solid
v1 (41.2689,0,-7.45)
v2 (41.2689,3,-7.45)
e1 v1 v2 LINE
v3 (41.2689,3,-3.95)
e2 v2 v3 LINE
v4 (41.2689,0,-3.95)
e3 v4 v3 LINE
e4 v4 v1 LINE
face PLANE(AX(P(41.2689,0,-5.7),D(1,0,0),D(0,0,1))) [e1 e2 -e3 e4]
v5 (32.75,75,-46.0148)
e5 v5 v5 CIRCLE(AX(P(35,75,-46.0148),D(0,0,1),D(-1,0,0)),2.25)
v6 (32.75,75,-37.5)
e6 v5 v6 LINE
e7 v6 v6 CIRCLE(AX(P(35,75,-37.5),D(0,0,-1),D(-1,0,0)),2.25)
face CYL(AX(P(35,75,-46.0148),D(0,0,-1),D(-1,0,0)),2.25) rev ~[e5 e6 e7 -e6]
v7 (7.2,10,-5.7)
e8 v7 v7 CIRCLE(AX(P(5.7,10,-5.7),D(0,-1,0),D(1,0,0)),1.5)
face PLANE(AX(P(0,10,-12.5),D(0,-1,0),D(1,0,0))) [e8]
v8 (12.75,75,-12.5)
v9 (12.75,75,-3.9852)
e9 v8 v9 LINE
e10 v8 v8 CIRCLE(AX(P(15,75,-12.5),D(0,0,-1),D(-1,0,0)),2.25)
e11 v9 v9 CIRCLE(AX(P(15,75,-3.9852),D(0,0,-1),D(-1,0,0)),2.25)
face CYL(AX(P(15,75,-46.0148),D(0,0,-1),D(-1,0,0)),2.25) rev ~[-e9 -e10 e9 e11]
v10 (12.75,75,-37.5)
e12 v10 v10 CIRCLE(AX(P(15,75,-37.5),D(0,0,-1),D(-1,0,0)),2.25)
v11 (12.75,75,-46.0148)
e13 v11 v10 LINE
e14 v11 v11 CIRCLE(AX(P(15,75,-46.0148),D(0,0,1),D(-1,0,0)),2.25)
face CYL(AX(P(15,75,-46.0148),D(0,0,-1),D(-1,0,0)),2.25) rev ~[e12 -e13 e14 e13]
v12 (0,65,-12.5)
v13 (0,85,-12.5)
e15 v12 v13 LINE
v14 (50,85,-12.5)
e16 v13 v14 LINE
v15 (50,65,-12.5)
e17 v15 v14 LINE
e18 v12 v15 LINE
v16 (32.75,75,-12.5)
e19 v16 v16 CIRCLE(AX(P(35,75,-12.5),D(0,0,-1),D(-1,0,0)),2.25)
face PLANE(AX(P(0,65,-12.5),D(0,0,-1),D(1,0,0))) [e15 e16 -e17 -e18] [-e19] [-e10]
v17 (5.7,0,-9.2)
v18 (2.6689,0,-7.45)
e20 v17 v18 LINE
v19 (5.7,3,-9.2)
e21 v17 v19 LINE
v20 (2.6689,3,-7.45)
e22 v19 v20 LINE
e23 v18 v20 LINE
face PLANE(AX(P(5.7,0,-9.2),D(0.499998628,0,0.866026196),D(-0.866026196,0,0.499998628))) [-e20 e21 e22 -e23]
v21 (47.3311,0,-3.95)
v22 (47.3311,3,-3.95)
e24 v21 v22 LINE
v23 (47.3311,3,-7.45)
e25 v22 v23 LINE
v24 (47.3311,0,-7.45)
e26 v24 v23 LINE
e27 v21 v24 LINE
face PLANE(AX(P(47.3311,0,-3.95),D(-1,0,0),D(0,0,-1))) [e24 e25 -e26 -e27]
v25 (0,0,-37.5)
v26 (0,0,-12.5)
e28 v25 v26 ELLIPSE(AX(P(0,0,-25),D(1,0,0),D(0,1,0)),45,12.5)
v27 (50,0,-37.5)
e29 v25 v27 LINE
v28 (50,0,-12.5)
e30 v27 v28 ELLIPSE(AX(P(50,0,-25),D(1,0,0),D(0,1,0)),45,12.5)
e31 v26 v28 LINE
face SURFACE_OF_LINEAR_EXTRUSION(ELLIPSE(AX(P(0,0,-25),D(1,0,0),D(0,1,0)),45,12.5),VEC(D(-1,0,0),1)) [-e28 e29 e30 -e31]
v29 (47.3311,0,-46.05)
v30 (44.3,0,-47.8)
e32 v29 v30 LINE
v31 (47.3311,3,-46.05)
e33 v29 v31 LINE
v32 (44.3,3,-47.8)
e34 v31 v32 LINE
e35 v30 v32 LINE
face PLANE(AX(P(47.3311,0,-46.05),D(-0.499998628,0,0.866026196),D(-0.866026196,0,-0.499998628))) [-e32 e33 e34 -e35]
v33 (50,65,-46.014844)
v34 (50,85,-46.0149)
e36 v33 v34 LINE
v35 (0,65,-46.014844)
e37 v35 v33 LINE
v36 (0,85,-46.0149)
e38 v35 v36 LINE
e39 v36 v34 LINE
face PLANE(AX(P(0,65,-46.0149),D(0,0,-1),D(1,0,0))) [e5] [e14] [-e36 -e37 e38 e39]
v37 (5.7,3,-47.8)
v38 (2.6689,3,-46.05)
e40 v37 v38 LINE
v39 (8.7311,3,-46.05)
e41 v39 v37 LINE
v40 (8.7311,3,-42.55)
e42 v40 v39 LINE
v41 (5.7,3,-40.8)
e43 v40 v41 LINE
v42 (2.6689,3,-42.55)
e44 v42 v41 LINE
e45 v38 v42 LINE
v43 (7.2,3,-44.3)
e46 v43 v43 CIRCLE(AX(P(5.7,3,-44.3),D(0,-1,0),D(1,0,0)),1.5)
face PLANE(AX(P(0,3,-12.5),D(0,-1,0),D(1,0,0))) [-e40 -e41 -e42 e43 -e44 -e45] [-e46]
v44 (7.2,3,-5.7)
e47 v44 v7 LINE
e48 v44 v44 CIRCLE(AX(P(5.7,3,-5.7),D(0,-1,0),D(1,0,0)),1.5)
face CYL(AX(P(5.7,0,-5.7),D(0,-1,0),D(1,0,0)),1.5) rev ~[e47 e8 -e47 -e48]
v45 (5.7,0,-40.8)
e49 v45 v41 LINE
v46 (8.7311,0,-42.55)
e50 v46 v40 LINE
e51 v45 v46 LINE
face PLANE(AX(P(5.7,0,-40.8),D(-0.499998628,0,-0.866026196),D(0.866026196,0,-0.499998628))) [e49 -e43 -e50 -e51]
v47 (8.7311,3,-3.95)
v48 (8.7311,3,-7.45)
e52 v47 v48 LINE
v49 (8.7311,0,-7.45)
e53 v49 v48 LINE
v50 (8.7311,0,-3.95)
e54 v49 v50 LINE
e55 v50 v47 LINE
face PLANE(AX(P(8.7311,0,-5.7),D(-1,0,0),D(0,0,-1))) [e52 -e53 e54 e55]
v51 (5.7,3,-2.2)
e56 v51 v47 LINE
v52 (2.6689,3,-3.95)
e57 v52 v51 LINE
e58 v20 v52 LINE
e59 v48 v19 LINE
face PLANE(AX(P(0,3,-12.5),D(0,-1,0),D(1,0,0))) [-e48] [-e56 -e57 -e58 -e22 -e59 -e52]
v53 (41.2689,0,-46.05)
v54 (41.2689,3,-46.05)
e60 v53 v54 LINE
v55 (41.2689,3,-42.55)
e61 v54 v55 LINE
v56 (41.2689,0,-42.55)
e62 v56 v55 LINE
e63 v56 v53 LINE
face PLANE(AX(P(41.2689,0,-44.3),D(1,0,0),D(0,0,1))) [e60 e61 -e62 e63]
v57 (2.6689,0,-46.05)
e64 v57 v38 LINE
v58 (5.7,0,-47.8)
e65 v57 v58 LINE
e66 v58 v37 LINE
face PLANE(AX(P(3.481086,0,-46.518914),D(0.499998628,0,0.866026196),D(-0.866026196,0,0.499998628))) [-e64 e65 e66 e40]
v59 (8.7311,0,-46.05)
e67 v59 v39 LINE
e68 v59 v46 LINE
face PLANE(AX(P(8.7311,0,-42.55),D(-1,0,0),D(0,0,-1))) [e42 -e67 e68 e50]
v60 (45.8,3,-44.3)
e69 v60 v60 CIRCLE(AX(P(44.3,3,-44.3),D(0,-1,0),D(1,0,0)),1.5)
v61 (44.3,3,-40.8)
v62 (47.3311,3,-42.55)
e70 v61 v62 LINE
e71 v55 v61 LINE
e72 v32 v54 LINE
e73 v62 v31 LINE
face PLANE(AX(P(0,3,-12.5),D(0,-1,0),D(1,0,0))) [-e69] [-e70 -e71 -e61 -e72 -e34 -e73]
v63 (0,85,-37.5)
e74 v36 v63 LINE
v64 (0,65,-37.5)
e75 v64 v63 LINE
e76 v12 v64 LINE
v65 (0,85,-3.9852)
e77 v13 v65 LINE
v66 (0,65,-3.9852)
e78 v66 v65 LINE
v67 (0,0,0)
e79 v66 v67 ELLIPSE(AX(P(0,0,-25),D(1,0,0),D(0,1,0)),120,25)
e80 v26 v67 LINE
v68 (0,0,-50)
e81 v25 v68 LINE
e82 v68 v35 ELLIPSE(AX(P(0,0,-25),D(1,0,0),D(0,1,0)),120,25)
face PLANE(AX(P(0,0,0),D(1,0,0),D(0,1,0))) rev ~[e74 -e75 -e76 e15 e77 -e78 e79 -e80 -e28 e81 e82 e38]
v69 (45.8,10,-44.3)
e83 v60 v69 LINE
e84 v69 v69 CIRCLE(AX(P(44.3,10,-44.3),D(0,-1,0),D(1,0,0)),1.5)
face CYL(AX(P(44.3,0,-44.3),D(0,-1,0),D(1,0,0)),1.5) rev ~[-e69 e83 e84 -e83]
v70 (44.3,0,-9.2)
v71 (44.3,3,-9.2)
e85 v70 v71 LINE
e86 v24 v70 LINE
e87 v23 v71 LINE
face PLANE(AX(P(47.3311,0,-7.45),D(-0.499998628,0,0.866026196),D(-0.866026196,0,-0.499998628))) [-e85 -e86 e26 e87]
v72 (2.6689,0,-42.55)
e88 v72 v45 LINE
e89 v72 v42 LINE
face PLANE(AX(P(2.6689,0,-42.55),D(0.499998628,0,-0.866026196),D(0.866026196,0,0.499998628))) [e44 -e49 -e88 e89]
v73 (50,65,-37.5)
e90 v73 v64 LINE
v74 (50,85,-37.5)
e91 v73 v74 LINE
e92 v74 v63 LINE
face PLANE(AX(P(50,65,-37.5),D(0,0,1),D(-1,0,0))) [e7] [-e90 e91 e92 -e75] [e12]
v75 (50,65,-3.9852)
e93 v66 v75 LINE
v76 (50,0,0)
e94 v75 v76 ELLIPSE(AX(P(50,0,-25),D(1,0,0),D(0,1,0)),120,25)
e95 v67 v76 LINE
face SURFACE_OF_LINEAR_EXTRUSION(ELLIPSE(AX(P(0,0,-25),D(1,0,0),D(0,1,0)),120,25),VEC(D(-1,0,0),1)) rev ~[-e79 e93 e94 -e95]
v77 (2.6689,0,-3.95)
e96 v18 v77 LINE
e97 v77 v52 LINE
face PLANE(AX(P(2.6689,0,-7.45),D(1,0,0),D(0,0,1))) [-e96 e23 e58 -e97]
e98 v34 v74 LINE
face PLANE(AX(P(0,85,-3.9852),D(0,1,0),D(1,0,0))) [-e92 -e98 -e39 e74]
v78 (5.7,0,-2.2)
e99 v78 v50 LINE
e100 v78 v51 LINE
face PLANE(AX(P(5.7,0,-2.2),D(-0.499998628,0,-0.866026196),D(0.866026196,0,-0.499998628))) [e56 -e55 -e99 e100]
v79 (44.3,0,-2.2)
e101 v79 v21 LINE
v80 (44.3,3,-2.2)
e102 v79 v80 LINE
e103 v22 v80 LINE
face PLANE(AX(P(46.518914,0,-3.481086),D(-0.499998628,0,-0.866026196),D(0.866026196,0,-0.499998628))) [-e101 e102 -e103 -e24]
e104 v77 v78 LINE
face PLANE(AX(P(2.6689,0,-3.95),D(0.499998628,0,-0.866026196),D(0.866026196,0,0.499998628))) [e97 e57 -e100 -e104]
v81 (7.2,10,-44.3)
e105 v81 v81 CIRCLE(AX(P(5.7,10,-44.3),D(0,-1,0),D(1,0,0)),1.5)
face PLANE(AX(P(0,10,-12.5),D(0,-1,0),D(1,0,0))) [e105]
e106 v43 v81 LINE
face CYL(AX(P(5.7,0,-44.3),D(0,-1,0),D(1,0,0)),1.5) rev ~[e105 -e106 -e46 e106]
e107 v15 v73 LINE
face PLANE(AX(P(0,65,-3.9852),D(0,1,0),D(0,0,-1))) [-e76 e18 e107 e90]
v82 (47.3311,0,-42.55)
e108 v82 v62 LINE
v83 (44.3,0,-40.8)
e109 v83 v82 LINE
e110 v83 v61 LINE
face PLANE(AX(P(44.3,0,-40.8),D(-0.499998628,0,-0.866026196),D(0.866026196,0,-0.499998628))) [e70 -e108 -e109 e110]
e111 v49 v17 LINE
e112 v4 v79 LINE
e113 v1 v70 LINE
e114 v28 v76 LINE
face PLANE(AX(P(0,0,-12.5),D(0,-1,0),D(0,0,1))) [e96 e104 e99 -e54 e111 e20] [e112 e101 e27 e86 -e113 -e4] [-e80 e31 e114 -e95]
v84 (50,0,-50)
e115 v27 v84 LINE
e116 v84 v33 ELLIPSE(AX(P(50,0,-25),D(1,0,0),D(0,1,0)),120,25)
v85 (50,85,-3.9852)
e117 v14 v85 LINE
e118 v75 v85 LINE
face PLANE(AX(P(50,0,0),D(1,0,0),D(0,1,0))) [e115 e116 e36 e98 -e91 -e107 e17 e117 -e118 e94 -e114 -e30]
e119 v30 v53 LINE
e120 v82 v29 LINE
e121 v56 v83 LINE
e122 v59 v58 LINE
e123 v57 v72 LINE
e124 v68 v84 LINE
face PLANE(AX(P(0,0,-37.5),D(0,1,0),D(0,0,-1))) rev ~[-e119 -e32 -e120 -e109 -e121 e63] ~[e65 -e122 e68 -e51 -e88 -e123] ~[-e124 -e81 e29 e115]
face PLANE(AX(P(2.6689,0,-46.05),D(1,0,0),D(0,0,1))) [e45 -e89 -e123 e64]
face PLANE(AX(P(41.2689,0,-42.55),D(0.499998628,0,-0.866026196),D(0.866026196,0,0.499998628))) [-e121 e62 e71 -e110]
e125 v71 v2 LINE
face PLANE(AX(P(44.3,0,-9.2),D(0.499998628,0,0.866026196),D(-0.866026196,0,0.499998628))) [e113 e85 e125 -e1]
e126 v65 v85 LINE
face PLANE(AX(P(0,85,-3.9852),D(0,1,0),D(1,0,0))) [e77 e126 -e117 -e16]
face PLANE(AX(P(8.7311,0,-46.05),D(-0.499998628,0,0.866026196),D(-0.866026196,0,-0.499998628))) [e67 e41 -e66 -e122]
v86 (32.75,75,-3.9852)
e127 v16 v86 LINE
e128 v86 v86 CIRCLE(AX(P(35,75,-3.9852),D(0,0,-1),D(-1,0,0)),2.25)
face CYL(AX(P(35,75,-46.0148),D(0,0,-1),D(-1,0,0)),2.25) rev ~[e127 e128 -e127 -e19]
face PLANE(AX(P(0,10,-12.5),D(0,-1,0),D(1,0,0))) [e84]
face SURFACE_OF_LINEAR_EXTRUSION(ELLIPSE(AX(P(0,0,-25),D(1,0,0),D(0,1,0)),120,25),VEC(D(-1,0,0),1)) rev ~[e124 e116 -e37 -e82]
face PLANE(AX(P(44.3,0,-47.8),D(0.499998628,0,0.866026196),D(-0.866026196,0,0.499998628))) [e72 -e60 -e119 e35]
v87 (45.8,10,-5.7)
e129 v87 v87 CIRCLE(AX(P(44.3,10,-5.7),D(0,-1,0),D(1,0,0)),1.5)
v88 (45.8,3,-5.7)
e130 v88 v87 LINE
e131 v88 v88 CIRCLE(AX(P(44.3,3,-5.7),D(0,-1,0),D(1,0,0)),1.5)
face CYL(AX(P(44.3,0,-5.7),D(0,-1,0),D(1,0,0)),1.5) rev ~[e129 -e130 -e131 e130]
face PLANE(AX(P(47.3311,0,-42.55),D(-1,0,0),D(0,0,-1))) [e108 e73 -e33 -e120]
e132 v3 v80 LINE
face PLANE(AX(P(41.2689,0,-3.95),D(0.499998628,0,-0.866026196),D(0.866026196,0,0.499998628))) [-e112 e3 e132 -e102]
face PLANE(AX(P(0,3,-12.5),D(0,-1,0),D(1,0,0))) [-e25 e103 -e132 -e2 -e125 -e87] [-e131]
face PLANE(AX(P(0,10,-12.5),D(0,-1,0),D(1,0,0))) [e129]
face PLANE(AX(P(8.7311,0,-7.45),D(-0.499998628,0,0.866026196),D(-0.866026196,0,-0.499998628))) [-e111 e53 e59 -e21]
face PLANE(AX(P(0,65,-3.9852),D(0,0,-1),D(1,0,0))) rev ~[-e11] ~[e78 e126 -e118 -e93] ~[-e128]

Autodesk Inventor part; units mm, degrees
ref_plane "YZ Plane" through (0, 0, 0) normal (1, 0, 0) x (0, 1, 0)
ref_plane "XZ Plane" through (0, 0, 0) normal (0, 1, 0) x (-1, 0, 0)
ref_plane "XY Plane" through (0, 0, 0) normal (0, 0, 1) x (1, 0, 0)
sketch "Sketch1" plane through (0, 0, 0) normal (1, 0, 0) x (0, 1, 0)
  ellipse E0 centre (0, -25) end of major axis (45, -25) minor radius 12.5 (0, -37.5) -> (0, -12.5) ccw
  ellipse E1 centre (0, -25) end of major axis (120, -25) minor radius 25 (0, -50) -> (0, 0) ccw
  line L0 (65, -3.9852) -> (65, -46.0148)
  line L1 (0, -37.5) -> (0, -50)
  line L2 (0, -12.5) -> (0, 0)
  point P0 (0, -43.75)
  point P1 (0, -6.25)
  dimension "d23" = 45
  dimension "d25" = 120
  dimension "d18" = 50
  dimension "d22" = 25
  dimension "d24" = 65
extrude "Extrusion1" add sketch "Sketch1" along normal blind 50 contours E0 L2 E1 L0 L1
sketch "Sketch3" plane through (0, 65, -3.9852) normal (0, 1, 0) x (1, 0, 0)
  line L0 (0, 42.0297) -> (0, 0) projected
  line L1 (0, 0) -> (50, 0) projected
  line L2 (50, 42.0297) -> (50, 0) projected
  line L3 (0, 42.0297) -> (50, 42.0297) projected
  line L4 (0, 33.5148) -> (0, 8.5148) projected
  line L5 (50, 0) -> (0, 0)
  line L6 (0, 0) -> (0, 8.5148)
  line L7 (0, 8.5148) -> (50, 8.5148)
  line L8 (50, 8.5148) -> (50, 0)
  line L9 (0, 42.0297) -> (50, 42.0297)
  line L10 (50, 42.0297) -> (50, 33.5148)
  line L11 (50, 33.5148) -> (0, 33.5148)
  line L12 (0, 33.5148) -> (0, 42.0297)
  point P0 (0, -3.9852)
  point P1 (0, 33.5148)
  dimension "d26" = 25
  dimension "d27" = 8.5148
  dimension "d28" = 8.5148
extrude "Extrusion3" add sketch "Sketch3" along normal blind 20 contours L3 L2 L11 L0 | L7 L2 L1 L0
sketch "Sketch4" plane through (50, 65, -46.0148) normal (0, 0, -1) x (-1, 0, 0)
  line L0 (50, 0) -> (0, 0) projected
  line L1 (50, 0) -> (50, 20) projected
  line L2 (0, 20) -> (50, 20) projected
  line L3 (0, 0) -> (0, 20) projected
  line L4 (0, 0) -> (0, 20) projected
  line L5 (0, 10) -> (50, 10)
  circle A0 centre (15, 10) radius 2.25
  circle A1 centre (35, 10) radius 2.25
  point P0 (50, -65)
  dimension "d31" = 4.5
  dimension "d32" = 4.5
  dimension "d33" = 20
  dimension "d34" = 15
  dimension "d35" = 15
extrude "Extrusion4" cut sketch "Sketch4" against normal through all contours A1 L5 | L5 A1 | A0 L5 | L5 A0
sketch "Sketch5" plane through (0, 0, -12.5) normal (0, -1, 0) x (1, 0, 0)
  line L0 (0, 12.5) -> (0, 0) projected
  line L1 (0, 0) -> (50, 0) projected
  line L2 (50, 12.5) -> (50, 0) projected
  line L3 (0, 12.5) -> (50, 12.5) projected
  line L4 (0, -25) -> (0, -37.5) projected
  line L5 (0, -37.5) -> (50, -37.5) projected
  line L6 (50, -25) -> (50, -37.5) projected
  line L7 (0, -25) -> (50, -25) projected
  line L8 (50, 8.5148) -> (50, 12.5) projected
  line L9 (0, -25) -> (0, -37.5) projected
  line L10 (50, 12.5) -> (0, -37.5)
  line L11 (5.7, 6.8) -> (44.3, 6.8)
  line L12 (44.3, 6.8) -> (44.3, -31.8)
  line L13 (44.3, -31.8) -> (5.7, -31.8)
  line L14 (5.7, -31.8) -> (5.7, 6.8)
  line L15 (5.7, 6.8) -> (44.3, -31.8) construction
  line L16 (44.3, 6.8) -> (5.7, -31.8) construction
  line L17 (44.3, 3.3) -> (41.2689, 5.05)
  line L18 (41.2689, 5.05) -> (41.2689, 8.55)
  line L19 (41.2689, 8.55) -> (44.3, 10.3)
  line L20 (44.3, 10.3) -> (47.3311, 8.55)
  line L21 (47.3311, 8.55) -> (47.3311, 5.05)
  line L22 (47.3311, 5.05) -> (44.3, 3.3)
  line L23 (41.2689, -33.55) -> (41.2689, -30.05)
  line L24 (41.2689, -30.05) -> (44.3, -28.3)
  line L25 (44.3, -28.3) -> (47.3311, -30.05)
  line L26 (47.3311, -30.05) -> (47.3311, -33.55)
  line L27 (47.3311, -33.55) -> (44.3, -35.3)
  line L28 (44.3, -35.3) -> (41.2689, -33.55)
  line L29 (8.7311, -30.05) -> (8.7311, -33.55)
  line L30 (8.7311, -33.55) -> (5.7, -35.3)
  line L31 (5.7, -35.3) -> (2.6689, -33.55)
  line L32 (2.6689, -33.55) -> (2.6689, -30.05)
  line L33 (2.6689, -30.05) -> (5.7, -28.3)
  line L34 (5.7, -28.3) -> (8.7311, -30.05)
  line L35 (8.7311, 8.55) -> (8.7311, 5.05)
  line L36 (8.7311, 5.05) -> (5.7, 3.3)
  line L37 (5.7, 3.3) -> (2.6689, 5.05)
  line L38 (2.6689, 5.05) -> (2.6689, 8.55)
  line L39 (2.6689, 8.55) -> (5.7, 10.3)
  line L40 (5.7, 10.3) -> (8.7311, 8.55)
  point P0 (25, -12.5)
  dimension "d38" = 38.6
  dimension "d39" = 38.6
  dimension "d40" = 7
  dimension "d41" = 7
  dimension "d42" = 7
  dimension "d43" = 7
extrude "Extrusion5" cut sketch "Sketch5" against normal blind 3 contours L20 L21 L22 L12 L10 | L10 L11 L18 L19 L20 | L37 L38 L39 L40 L35 L11 L14 | L14 L11 L35 L36 | L12 L17 L10 | L10 L17 L18 L11 | L34 L10 L14 | L14 L10 L31 L32 L33 | L34 L29 L13 L10 | L13 L29 L30 L31 L10 | L25 L26 L27 L28 L23 L13 L12 | L12 L13 L23 L24
sketch "Sketch6" plane through (0, 0, -12.5) normal (0, -1, 0) x (1, 0, 0)
  line L0 (44.3, 10.3) -> (47.3311, 8.55) projected
  line L1 (41.2689, 8.55) -> (44.3, 10.3) projected
  line L2 (41.2689, 5.05) -> (41.2689, 8.55) projected
  line L3 (44.3, 3.3) -> (41.2689, 5.05) projected
  line L4 (47.3311, 5.05) -> (44.3, 3.3) projected
  line L5 (47.3311, 8.55) -> (47.3311, 5.05) projected
  line L6 (47.3311, -33.55) -> (44.3, -35.3) projected
  line L7 (47.3311, -30.05) -> (47.3311, -33.55) projected
  line L8 (44.3, -28.3) -> (47.3311, -30.05) projected
  line L9 (41.2689, -30.05) -> (44.3, -28.3) projected
  line L10 (41.2689, -33.55) -> (41.2689, -30.05) projected
  line L11 (44.3, -35.3) -> (41.2689, -33.55) projected
  line L12 (5.7, -35.3) -> (2.6689, -33.55) projected
  line L13 (8.7311, -33.55) -> (5.7, -35.3) projected
  line L14 (8.7311, -30.05) -> (8.7311, -33.55) projected
  line L15 (5.7, -28.3) -> (8.7311, -30.05) projected
  line L16 (2.6689, -30.05) -> (5.7, -28.3) projected
  line L17 (2.6689, -33.55) -> (2.6689, -30.05) projected
  line L18 (2.6689, 8.55) -> (5.7, 10.3) projected
  line L19 (2.6689, 5.05) -> (2.6689, 8.55) projected
  line L20 (5.7, 3.3) -> (2.6689, 5.05) projected
  line L21 (8.7311, 5.05) -> (5.7, 3.3) projected
  line L22 (8.7311, 8.55) -> (8.7311, 5.05) projected
  line L23 (5.7, 10.3) -> (8.7311, 8.55) projected
  line L24 (8.7311, 8.55) -> (2.6689, 5.05)
  circle A0 centre (5.7, 6.8) radius 1.5
  line L25 (2.6689, -30.05) -> (8.7311, -33.55)
  line L26 (47.3311, -33.55) -> (44.3, -35.3) projected
  line L27 (41.2689, -30.05) -> (47.3311, -33.55)
  line L28 (41.2689, 5.05) -> (41.2689, 8.55) projected
  line L29 (47.3311, 5.05) -> (44.3, 3.3) projected
  line L30 (41.2689, 8.55) -> (47.3311, 5.05)
  circle A1 centre (44.3, 6.8) radius 1.5
  circle A2 centre (44.3, -31.8) radius 1.5
  circle A3 centre (5.7, -31.8) radius 1.5
  point P0 (0, 12.5)
  dimension "d46" = 3
  dimension "d47" = 3
  dimension "d48" = 3
  dimension "d49" = 3
extrude "Extrusion6" cut sketch "Sketch6" against normal blind 10 contours A1 L30 | L30 A1 | A2 L27 | L27 A2 | A3 L25 | L25 A3 | A0 L24 | L24 A0
equation "\"d27\" = d28"
properties part number "Arch" material "ABS Plastic"
